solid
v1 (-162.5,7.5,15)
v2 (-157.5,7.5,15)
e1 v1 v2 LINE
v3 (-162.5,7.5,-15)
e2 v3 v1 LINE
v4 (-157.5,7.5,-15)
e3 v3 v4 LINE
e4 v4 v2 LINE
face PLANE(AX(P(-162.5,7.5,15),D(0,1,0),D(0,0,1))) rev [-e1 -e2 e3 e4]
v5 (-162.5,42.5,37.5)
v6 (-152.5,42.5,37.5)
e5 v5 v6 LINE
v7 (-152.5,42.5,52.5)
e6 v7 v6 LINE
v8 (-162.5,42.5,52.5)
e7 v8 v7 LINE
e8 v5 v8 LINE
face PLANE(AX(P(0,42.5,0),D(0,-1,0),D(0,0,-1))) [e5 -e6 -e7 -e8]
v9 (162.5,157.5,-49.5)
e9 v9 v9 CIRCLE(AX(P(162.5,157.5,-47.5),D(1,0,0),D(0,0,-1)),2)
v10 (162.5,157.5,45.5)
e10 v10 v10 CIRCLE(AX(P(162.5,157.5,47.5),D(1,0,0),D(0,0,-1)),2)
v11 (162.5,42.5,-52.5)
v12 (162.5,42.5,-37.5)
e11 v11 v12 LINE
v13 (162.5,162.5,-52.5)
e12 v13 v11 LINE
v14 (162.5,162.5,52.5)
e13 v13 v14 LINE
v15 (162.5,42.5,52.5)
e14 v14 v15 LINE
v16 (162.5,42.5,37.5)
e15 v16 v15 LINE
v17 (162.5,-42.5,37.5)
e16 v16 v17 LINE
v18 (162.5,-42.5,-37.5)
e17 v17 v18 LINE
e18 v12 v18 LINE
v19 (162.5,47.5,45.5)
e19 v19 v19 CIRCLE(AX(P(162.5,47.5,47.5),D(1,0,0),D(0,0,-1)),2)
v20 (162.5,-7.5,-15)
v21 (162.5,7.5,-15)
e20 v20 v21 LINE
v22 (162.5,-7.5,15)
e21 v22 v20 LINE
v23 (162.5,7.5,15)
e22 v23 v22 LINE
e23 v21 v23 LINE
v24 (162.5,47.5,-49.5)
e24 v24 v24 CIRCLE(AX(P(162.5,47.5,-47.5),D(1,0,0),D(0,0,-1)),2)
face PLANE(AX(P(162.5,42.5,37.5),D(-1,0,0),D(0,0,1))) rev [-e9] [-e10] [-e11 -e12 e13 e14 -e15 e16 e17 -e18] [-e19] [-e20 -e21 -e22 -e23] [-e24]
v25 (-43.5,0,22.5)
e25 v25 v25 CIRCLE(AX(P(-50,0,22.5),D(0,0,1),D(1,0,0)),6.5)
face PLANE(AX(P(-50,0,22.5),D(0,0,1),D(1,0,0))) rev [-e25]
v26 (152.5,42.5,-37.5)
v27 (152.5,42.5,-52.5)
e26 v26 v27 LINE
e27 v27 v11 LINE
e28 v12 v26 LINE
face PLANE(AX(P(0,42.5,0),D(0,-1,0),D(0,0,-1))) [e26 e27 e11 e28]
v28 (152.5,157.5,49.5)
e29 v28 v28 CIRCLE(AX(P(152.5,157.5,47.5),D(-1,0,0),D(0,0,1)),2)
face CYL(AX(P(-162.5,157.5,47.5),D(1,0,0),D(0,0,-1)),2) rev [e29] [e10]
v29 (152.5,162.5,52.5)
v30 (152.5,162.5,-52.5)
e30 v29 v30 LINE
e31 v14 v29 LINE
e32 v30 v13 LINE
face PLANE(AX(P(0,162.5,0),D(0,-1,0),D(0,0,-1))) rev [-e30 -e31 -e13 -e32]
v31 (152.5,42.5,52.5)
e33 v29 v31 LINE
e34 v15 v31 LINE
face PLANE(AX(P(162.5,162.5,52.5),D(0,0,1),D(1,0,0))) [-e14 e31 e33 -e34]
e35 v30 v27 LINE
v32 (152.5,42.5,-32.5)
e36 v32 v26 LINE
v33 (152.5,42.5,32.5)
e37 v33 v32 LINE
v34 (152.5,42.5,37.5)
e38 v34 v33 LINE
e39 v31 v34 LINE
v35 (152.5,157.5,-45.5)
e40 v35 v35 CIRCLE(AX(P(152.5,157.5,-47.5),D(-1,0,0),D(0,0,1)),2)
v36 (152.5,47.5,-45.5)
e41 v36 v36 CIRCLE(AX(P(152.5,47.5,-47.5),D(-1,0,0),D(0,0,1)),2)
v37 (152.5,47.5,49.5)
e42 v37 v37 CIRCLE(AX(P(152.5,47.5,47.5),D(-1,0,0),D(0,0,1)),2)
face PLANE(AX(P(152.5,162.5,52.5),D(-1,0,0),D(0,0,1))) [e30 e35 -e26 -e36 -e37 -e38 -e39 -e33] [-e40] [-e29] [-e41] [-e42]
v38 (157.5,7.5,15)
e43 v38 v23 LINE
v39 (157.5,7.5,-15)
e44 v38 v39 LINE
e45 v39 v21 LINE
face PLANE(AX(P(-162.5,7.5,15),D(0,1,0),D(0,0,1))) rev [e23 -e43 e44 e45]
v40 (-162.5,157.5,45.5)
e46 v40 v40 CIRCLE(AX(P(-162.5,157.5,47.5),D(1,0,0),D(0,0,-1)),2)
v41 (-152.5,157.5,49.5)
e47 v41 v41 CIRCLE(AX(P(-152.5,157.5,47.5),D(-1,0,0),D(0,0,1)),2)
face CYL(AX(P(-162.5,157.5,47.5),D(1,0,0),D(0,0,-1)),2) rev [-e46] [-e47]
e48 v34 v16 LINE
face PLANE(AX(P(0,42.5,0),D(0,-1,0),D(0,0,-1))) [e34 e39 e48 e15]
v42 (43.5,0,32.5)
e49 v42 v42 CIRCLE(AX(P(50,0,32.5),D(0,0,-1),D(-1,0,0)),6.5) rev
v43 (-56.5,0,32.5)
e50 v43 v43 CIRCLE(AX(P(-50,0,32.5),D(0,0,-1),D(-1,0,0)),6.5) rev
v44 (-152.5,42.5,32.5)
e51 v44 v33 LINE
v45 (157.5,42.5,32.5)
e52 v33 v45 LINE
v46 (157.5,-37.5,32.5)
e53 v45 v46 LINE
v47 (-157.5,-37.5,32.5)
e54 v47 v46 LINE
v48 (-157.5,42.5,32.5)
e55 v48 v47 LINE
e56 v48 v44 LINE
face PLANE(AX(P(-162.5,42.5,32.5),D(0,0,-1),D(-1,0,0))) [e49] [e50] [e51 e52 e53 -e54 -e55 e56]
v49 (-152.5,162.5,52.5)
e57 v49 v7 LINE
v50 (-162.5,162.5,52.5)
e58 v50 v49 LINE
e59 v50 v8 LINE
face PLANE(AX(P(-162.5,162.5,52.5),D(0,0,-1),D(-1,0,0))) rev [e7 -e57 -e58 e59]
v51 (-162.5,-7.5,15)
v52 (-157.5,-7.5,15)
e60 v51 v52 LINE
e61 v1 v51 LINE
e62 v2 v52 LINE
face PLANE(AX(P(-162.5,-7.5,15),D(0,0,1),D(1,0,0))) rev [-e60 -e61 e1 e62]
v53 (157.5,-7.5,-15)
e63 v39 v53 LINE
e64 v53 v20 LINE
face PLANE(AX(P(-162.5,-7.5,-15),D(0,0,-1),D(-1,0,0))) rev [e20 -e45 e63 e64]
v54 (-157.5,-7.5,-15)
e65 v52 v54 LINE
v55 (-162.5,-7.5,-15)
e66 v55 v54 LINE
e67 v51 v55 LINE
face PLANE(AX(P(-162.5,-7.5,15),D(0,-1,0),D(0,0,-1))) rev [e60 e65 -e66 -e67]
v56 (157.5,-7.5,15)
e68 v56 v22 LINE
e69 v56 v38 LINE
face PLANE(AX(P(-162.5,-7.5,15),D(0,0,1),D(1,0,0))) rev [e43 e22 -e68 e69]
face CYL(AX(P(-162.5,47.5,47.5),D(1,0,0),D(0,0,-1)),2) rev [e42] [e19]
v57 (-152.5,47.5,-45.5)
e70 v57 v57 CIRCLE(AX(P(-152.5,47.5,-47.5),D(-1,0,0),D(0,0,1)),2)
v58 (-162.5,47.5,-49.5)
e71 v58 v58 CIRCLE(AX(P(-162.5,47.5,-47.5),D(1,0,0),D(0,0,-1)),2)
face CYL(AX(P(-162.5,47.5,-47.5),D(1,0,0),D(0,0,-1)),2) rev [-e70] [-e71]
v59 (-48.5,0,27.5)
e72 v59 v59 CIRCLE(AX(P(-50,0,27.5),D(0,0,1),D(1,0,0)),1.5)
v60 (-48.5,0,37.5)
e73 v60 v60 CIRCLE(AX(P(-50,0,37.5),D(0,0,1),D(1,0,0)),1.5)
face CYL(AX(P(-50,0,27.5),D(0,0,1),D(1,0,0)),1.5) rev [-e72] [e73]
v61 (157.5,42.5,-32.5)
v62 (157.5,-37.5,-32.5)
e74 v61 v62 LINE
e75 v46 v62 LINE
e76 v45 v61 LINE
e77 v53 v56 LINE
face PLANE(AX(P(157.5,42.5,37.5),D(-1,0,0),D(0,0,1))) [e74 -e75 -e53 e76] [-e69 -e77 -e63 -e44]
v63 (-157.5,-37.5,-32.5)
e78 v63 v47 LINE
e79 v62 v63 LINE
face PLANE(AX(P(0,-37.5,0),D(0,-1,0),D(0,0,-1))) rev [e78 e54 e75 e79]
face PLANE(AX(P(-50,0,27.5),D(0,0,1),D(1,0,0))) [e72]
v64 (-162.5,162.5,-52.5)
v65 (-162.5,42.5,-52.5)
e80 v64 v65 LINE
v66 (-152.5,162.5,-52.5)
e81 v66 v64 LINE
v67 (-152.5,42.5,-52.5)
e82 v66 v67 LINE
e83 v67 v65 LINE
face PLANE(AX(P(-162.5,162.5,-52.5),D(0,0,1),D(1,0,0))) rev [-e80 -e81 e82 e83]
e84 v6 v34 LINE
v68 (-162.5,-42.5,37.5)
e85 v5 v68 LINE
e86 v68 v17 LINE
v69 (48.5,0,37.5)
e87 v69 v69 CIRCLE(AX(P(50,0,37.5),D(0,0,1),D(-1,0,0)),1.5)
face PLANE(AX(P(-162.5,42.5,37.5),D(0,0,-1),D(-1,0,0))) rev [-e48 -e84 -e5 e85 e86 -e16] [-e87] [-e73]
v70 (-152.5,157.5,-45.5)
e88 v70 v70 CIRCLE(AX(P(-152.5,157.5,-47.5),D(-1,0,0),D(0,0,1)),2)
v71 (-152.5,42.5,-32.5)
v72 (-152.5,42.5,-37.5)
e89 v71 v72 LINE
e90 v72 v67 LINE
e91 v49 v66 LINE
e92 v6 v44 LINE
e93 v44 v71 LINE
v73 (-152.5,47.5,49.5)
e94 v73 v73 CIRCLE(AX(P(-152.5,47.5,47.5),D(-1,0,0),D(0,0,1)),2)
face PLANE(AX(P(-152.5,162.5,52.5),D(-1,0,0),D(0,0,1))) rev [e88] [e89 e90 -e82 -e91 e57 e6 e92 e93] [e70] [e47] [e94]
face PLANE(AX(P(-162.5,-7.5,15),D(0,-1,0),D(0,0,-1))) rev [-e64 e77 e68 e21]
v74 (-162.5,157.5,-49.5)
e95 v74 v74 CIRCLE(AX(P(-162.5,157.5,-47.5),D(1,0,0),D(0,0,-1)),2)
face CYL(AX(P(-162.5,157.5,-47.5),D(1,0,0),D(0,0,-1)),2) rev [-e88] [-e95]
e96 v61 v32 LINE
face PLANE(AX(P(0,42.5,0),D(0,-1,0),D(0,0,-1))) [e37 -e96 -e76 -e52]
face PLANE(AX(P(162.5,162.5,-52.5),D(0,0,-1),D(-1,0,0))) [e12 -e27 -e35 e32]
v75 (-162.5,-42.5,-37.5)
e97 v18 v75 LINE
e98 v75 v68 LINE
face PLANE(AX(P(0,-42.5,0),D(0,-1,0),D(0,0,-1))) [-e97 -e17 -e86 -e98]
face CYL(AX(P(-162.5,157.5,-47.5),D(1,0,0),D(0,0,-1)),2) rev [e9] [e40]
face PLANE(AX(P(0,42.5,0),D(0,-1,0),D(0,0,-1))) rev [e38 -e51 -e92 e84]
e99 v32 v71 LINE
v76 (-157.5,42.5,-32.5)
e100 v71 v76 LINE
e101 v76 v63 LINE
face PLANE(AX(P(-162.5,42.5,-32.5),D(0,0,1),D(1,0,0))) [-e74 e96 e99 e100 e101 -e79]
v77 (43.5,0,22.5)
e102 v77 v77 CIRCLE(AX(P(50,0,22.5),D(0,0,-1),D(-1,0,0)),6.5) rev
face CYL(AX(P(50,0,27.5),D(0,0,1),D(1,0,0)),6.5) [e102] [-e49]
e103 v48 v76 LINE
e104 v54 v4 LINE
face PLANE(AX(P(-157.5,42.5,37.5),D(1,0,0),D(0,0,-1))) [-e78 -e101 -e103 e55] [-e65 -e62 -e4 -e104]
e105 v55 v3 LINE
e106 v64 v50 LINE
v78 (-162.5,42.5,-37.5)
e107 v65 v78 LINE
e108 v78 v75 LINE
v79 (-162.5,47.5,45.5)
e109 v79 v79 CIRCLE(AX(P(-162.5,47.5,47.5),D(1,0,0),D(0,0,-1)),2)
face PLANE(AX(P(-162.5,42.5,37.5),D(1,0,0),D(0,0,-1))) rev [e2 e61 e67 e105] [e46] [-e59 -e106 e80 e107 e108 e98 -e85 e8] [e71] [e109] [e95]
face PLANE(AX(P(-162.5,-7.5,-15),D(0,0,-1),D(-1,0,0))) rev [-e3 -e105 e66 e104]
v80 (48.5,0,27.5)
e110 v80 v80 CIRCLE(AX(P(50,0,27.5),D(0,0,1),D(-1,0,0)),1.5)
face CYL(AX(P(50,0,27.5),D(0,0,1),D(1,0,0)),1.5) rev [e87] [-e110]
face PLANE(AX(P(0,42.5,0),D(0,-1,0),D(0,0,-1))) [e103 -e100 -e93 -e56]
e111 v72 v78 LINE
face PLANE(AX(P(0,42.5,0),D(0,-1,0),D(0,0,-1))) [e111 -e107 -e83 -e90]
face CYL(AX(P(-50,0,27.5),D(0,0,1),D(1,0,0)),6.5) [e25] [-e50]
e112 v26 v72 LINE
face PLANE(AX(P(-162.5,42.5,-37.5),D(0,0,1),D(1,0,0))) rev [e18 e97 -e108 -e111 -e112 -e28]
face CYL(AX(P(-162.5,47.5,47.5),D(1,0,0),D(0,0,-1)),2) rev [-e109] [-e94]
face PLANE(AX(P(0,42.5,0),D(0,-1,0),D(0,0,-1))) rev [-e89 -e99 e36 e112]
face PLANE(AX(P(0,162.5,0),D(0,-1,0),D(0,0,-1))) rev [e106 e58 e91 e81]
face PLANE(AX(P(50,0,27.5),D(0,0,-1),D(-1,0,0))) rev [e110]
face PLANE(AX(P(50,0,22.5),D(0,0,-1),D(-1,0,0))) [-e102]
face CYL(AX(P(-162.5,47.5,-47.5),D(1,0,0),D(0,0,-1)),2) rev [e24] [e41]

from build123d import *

# Parameters (mm, degrees)
SKETCH1_W           = 325
SKETCH1_H           = 75
BOSS_EXTRUDE1_DEPTH = 42.5
SKETCH2_R           = 1.5
CUT_EXTRUDE1_DEPTH  = 10
SKETCH3_W           = 10
SKETCH3_H           = 105
BOSS_EXTRUDE2_DEPTH = 120
SHELL1_START        = -32.5
SHELL1_OUTLINE_W    = 315
SHELL1_OUTLINE_H    = 80
SHELL1_OUTLINE_R    = 6.5
SHELL1_DEPTH        = 65
SHELL1_2_OUTLINE_R  = 6.5
SHELL1_2_DEPTH      = 55
SKETCH4_W           = 30
SKETCH4_H           = 15
CUT_EXTRUDE2_DEPTH  = 368.134171659
SKETCH5_R           = 2
CUT_EXTRUDE3_DEPTH  = 368.134171659


# Read off the part's stored shape, not the designer's step: Shell1
with BuildPart() as part:
    # Sketch1 → Boss-Extrude1 (new, symmetric)
    with BuildSketch(Plane(origin=(0, 0, 0), x_dir=(1, 0, 0), z_dir=(0, 1, 0))):
        Rectangle(SKETCH1_W, SKETCH1_H)
    extrude(amount=BOSS_EXTRUDE1_DEPTH, both=True)

    # Sketch2 → Cut-Extrude1 (cut)
    with BuildSketch(Plane.XY.offset(37.5)):
        with Locations((-50, 0)):
            Circle(SKETCH2_R)
        with Locations(Location((50, 0, 0), (0, 0, 180))):
            Circle(SKETCH2_R)
    extrude(amount=-CUT_EXTRUDE1_DEPTH, mode=Mode.SUBTRACT)

    # Sketch3 → Boss-Extrude2 (add)
    with BuildSketch(Plane(origin=(0, 42.5, 0), x_dir=(1, 0, 0), z_dir=(0, 1, 0))):
        with Locations((-157.5, 0)):
            Rectangle(SKETCH3_W, SKETCH3_H)
    boss_extrude2 = extrude(amount=BOSS_EXTRUDE2_DEPTH)

    # Mirror1: Boss-Extrude2 across plane
    add(boss_extrude2.mirror(Plane(origin=(0, 0, 0), x_dir=(0, 0, 1), z_dir=(1, 0, 0))))

    # Shell1 outline → Shell1 (cut)
    with BuildSketch(Plane.XY.offset(SHELL1_START)):
        with Locations((0, 2.5)):
            Rectangle(SHELL1_OUTLINE_W, SHELL1_OUTLINE_H)
        with Locations((-50, 0)):
            Circle(SHELL1_OUTLINE_R, mode=Mode.SUBTRACT)
        with Locations((50, 0)):
            Circle(SHELL1_OUTLINE_R, mode=Mode.SUBTRACT)
    extrude(amount=SHELL1_DEPTH, mode=Mode.SUBTRACT)

    # Shell1 2 outline → Shell1 2 (cut)
    with BuildSketch(Plane.XY.offset(SHELL1_START)):
        with Locations((50, 0)):
            Circle(SHELL1_2_OUTLINE_R)
        with Locations((-50, 0)):
            Circle(SHELL1_2_OUTLINE_R)
    extrude(amount=SHELL1_2_DEPTH, mode=Mode.SUBTRACT)

    # Sketch4 → Cut-Extrude2 (cut, through all)
    with BuildSketch(Plane(origin=(162.5, 0, 0), x_dir=(0, 0, -1), z_dir=(1, 0, 0))):
        Rectangle(SKETCH4_W, SKETCH4_H)
    extrude(amount=-CUT_EXTRUDE2_DEPTH, mode=Mode.SUBTRACT)

    # Sketch5 → Cut-Extrude3 (cut, through all)
    with BuildSketch(Plane(origin=(162.5, 0, 0), x_dir=(0, 0, -1), z_dir=(1, 0, 0))):
        with Locations((-47.5, 47.5)):
            Circle(SKETCH5_R)
        with Locations((47.5, 47.5)):
            Circle(SKETCH5_R)
        with Locations((47.5, 157.5)):
            Circle(SKETCH5_R)
        with Locations((-47.5, 157.5)):
            Circle(SKETCH5_R)
    extrude(amount=-CUT_EXTRUDE3_DEPTH, mode=Mode.SUBTRACT)


solid = part.part
